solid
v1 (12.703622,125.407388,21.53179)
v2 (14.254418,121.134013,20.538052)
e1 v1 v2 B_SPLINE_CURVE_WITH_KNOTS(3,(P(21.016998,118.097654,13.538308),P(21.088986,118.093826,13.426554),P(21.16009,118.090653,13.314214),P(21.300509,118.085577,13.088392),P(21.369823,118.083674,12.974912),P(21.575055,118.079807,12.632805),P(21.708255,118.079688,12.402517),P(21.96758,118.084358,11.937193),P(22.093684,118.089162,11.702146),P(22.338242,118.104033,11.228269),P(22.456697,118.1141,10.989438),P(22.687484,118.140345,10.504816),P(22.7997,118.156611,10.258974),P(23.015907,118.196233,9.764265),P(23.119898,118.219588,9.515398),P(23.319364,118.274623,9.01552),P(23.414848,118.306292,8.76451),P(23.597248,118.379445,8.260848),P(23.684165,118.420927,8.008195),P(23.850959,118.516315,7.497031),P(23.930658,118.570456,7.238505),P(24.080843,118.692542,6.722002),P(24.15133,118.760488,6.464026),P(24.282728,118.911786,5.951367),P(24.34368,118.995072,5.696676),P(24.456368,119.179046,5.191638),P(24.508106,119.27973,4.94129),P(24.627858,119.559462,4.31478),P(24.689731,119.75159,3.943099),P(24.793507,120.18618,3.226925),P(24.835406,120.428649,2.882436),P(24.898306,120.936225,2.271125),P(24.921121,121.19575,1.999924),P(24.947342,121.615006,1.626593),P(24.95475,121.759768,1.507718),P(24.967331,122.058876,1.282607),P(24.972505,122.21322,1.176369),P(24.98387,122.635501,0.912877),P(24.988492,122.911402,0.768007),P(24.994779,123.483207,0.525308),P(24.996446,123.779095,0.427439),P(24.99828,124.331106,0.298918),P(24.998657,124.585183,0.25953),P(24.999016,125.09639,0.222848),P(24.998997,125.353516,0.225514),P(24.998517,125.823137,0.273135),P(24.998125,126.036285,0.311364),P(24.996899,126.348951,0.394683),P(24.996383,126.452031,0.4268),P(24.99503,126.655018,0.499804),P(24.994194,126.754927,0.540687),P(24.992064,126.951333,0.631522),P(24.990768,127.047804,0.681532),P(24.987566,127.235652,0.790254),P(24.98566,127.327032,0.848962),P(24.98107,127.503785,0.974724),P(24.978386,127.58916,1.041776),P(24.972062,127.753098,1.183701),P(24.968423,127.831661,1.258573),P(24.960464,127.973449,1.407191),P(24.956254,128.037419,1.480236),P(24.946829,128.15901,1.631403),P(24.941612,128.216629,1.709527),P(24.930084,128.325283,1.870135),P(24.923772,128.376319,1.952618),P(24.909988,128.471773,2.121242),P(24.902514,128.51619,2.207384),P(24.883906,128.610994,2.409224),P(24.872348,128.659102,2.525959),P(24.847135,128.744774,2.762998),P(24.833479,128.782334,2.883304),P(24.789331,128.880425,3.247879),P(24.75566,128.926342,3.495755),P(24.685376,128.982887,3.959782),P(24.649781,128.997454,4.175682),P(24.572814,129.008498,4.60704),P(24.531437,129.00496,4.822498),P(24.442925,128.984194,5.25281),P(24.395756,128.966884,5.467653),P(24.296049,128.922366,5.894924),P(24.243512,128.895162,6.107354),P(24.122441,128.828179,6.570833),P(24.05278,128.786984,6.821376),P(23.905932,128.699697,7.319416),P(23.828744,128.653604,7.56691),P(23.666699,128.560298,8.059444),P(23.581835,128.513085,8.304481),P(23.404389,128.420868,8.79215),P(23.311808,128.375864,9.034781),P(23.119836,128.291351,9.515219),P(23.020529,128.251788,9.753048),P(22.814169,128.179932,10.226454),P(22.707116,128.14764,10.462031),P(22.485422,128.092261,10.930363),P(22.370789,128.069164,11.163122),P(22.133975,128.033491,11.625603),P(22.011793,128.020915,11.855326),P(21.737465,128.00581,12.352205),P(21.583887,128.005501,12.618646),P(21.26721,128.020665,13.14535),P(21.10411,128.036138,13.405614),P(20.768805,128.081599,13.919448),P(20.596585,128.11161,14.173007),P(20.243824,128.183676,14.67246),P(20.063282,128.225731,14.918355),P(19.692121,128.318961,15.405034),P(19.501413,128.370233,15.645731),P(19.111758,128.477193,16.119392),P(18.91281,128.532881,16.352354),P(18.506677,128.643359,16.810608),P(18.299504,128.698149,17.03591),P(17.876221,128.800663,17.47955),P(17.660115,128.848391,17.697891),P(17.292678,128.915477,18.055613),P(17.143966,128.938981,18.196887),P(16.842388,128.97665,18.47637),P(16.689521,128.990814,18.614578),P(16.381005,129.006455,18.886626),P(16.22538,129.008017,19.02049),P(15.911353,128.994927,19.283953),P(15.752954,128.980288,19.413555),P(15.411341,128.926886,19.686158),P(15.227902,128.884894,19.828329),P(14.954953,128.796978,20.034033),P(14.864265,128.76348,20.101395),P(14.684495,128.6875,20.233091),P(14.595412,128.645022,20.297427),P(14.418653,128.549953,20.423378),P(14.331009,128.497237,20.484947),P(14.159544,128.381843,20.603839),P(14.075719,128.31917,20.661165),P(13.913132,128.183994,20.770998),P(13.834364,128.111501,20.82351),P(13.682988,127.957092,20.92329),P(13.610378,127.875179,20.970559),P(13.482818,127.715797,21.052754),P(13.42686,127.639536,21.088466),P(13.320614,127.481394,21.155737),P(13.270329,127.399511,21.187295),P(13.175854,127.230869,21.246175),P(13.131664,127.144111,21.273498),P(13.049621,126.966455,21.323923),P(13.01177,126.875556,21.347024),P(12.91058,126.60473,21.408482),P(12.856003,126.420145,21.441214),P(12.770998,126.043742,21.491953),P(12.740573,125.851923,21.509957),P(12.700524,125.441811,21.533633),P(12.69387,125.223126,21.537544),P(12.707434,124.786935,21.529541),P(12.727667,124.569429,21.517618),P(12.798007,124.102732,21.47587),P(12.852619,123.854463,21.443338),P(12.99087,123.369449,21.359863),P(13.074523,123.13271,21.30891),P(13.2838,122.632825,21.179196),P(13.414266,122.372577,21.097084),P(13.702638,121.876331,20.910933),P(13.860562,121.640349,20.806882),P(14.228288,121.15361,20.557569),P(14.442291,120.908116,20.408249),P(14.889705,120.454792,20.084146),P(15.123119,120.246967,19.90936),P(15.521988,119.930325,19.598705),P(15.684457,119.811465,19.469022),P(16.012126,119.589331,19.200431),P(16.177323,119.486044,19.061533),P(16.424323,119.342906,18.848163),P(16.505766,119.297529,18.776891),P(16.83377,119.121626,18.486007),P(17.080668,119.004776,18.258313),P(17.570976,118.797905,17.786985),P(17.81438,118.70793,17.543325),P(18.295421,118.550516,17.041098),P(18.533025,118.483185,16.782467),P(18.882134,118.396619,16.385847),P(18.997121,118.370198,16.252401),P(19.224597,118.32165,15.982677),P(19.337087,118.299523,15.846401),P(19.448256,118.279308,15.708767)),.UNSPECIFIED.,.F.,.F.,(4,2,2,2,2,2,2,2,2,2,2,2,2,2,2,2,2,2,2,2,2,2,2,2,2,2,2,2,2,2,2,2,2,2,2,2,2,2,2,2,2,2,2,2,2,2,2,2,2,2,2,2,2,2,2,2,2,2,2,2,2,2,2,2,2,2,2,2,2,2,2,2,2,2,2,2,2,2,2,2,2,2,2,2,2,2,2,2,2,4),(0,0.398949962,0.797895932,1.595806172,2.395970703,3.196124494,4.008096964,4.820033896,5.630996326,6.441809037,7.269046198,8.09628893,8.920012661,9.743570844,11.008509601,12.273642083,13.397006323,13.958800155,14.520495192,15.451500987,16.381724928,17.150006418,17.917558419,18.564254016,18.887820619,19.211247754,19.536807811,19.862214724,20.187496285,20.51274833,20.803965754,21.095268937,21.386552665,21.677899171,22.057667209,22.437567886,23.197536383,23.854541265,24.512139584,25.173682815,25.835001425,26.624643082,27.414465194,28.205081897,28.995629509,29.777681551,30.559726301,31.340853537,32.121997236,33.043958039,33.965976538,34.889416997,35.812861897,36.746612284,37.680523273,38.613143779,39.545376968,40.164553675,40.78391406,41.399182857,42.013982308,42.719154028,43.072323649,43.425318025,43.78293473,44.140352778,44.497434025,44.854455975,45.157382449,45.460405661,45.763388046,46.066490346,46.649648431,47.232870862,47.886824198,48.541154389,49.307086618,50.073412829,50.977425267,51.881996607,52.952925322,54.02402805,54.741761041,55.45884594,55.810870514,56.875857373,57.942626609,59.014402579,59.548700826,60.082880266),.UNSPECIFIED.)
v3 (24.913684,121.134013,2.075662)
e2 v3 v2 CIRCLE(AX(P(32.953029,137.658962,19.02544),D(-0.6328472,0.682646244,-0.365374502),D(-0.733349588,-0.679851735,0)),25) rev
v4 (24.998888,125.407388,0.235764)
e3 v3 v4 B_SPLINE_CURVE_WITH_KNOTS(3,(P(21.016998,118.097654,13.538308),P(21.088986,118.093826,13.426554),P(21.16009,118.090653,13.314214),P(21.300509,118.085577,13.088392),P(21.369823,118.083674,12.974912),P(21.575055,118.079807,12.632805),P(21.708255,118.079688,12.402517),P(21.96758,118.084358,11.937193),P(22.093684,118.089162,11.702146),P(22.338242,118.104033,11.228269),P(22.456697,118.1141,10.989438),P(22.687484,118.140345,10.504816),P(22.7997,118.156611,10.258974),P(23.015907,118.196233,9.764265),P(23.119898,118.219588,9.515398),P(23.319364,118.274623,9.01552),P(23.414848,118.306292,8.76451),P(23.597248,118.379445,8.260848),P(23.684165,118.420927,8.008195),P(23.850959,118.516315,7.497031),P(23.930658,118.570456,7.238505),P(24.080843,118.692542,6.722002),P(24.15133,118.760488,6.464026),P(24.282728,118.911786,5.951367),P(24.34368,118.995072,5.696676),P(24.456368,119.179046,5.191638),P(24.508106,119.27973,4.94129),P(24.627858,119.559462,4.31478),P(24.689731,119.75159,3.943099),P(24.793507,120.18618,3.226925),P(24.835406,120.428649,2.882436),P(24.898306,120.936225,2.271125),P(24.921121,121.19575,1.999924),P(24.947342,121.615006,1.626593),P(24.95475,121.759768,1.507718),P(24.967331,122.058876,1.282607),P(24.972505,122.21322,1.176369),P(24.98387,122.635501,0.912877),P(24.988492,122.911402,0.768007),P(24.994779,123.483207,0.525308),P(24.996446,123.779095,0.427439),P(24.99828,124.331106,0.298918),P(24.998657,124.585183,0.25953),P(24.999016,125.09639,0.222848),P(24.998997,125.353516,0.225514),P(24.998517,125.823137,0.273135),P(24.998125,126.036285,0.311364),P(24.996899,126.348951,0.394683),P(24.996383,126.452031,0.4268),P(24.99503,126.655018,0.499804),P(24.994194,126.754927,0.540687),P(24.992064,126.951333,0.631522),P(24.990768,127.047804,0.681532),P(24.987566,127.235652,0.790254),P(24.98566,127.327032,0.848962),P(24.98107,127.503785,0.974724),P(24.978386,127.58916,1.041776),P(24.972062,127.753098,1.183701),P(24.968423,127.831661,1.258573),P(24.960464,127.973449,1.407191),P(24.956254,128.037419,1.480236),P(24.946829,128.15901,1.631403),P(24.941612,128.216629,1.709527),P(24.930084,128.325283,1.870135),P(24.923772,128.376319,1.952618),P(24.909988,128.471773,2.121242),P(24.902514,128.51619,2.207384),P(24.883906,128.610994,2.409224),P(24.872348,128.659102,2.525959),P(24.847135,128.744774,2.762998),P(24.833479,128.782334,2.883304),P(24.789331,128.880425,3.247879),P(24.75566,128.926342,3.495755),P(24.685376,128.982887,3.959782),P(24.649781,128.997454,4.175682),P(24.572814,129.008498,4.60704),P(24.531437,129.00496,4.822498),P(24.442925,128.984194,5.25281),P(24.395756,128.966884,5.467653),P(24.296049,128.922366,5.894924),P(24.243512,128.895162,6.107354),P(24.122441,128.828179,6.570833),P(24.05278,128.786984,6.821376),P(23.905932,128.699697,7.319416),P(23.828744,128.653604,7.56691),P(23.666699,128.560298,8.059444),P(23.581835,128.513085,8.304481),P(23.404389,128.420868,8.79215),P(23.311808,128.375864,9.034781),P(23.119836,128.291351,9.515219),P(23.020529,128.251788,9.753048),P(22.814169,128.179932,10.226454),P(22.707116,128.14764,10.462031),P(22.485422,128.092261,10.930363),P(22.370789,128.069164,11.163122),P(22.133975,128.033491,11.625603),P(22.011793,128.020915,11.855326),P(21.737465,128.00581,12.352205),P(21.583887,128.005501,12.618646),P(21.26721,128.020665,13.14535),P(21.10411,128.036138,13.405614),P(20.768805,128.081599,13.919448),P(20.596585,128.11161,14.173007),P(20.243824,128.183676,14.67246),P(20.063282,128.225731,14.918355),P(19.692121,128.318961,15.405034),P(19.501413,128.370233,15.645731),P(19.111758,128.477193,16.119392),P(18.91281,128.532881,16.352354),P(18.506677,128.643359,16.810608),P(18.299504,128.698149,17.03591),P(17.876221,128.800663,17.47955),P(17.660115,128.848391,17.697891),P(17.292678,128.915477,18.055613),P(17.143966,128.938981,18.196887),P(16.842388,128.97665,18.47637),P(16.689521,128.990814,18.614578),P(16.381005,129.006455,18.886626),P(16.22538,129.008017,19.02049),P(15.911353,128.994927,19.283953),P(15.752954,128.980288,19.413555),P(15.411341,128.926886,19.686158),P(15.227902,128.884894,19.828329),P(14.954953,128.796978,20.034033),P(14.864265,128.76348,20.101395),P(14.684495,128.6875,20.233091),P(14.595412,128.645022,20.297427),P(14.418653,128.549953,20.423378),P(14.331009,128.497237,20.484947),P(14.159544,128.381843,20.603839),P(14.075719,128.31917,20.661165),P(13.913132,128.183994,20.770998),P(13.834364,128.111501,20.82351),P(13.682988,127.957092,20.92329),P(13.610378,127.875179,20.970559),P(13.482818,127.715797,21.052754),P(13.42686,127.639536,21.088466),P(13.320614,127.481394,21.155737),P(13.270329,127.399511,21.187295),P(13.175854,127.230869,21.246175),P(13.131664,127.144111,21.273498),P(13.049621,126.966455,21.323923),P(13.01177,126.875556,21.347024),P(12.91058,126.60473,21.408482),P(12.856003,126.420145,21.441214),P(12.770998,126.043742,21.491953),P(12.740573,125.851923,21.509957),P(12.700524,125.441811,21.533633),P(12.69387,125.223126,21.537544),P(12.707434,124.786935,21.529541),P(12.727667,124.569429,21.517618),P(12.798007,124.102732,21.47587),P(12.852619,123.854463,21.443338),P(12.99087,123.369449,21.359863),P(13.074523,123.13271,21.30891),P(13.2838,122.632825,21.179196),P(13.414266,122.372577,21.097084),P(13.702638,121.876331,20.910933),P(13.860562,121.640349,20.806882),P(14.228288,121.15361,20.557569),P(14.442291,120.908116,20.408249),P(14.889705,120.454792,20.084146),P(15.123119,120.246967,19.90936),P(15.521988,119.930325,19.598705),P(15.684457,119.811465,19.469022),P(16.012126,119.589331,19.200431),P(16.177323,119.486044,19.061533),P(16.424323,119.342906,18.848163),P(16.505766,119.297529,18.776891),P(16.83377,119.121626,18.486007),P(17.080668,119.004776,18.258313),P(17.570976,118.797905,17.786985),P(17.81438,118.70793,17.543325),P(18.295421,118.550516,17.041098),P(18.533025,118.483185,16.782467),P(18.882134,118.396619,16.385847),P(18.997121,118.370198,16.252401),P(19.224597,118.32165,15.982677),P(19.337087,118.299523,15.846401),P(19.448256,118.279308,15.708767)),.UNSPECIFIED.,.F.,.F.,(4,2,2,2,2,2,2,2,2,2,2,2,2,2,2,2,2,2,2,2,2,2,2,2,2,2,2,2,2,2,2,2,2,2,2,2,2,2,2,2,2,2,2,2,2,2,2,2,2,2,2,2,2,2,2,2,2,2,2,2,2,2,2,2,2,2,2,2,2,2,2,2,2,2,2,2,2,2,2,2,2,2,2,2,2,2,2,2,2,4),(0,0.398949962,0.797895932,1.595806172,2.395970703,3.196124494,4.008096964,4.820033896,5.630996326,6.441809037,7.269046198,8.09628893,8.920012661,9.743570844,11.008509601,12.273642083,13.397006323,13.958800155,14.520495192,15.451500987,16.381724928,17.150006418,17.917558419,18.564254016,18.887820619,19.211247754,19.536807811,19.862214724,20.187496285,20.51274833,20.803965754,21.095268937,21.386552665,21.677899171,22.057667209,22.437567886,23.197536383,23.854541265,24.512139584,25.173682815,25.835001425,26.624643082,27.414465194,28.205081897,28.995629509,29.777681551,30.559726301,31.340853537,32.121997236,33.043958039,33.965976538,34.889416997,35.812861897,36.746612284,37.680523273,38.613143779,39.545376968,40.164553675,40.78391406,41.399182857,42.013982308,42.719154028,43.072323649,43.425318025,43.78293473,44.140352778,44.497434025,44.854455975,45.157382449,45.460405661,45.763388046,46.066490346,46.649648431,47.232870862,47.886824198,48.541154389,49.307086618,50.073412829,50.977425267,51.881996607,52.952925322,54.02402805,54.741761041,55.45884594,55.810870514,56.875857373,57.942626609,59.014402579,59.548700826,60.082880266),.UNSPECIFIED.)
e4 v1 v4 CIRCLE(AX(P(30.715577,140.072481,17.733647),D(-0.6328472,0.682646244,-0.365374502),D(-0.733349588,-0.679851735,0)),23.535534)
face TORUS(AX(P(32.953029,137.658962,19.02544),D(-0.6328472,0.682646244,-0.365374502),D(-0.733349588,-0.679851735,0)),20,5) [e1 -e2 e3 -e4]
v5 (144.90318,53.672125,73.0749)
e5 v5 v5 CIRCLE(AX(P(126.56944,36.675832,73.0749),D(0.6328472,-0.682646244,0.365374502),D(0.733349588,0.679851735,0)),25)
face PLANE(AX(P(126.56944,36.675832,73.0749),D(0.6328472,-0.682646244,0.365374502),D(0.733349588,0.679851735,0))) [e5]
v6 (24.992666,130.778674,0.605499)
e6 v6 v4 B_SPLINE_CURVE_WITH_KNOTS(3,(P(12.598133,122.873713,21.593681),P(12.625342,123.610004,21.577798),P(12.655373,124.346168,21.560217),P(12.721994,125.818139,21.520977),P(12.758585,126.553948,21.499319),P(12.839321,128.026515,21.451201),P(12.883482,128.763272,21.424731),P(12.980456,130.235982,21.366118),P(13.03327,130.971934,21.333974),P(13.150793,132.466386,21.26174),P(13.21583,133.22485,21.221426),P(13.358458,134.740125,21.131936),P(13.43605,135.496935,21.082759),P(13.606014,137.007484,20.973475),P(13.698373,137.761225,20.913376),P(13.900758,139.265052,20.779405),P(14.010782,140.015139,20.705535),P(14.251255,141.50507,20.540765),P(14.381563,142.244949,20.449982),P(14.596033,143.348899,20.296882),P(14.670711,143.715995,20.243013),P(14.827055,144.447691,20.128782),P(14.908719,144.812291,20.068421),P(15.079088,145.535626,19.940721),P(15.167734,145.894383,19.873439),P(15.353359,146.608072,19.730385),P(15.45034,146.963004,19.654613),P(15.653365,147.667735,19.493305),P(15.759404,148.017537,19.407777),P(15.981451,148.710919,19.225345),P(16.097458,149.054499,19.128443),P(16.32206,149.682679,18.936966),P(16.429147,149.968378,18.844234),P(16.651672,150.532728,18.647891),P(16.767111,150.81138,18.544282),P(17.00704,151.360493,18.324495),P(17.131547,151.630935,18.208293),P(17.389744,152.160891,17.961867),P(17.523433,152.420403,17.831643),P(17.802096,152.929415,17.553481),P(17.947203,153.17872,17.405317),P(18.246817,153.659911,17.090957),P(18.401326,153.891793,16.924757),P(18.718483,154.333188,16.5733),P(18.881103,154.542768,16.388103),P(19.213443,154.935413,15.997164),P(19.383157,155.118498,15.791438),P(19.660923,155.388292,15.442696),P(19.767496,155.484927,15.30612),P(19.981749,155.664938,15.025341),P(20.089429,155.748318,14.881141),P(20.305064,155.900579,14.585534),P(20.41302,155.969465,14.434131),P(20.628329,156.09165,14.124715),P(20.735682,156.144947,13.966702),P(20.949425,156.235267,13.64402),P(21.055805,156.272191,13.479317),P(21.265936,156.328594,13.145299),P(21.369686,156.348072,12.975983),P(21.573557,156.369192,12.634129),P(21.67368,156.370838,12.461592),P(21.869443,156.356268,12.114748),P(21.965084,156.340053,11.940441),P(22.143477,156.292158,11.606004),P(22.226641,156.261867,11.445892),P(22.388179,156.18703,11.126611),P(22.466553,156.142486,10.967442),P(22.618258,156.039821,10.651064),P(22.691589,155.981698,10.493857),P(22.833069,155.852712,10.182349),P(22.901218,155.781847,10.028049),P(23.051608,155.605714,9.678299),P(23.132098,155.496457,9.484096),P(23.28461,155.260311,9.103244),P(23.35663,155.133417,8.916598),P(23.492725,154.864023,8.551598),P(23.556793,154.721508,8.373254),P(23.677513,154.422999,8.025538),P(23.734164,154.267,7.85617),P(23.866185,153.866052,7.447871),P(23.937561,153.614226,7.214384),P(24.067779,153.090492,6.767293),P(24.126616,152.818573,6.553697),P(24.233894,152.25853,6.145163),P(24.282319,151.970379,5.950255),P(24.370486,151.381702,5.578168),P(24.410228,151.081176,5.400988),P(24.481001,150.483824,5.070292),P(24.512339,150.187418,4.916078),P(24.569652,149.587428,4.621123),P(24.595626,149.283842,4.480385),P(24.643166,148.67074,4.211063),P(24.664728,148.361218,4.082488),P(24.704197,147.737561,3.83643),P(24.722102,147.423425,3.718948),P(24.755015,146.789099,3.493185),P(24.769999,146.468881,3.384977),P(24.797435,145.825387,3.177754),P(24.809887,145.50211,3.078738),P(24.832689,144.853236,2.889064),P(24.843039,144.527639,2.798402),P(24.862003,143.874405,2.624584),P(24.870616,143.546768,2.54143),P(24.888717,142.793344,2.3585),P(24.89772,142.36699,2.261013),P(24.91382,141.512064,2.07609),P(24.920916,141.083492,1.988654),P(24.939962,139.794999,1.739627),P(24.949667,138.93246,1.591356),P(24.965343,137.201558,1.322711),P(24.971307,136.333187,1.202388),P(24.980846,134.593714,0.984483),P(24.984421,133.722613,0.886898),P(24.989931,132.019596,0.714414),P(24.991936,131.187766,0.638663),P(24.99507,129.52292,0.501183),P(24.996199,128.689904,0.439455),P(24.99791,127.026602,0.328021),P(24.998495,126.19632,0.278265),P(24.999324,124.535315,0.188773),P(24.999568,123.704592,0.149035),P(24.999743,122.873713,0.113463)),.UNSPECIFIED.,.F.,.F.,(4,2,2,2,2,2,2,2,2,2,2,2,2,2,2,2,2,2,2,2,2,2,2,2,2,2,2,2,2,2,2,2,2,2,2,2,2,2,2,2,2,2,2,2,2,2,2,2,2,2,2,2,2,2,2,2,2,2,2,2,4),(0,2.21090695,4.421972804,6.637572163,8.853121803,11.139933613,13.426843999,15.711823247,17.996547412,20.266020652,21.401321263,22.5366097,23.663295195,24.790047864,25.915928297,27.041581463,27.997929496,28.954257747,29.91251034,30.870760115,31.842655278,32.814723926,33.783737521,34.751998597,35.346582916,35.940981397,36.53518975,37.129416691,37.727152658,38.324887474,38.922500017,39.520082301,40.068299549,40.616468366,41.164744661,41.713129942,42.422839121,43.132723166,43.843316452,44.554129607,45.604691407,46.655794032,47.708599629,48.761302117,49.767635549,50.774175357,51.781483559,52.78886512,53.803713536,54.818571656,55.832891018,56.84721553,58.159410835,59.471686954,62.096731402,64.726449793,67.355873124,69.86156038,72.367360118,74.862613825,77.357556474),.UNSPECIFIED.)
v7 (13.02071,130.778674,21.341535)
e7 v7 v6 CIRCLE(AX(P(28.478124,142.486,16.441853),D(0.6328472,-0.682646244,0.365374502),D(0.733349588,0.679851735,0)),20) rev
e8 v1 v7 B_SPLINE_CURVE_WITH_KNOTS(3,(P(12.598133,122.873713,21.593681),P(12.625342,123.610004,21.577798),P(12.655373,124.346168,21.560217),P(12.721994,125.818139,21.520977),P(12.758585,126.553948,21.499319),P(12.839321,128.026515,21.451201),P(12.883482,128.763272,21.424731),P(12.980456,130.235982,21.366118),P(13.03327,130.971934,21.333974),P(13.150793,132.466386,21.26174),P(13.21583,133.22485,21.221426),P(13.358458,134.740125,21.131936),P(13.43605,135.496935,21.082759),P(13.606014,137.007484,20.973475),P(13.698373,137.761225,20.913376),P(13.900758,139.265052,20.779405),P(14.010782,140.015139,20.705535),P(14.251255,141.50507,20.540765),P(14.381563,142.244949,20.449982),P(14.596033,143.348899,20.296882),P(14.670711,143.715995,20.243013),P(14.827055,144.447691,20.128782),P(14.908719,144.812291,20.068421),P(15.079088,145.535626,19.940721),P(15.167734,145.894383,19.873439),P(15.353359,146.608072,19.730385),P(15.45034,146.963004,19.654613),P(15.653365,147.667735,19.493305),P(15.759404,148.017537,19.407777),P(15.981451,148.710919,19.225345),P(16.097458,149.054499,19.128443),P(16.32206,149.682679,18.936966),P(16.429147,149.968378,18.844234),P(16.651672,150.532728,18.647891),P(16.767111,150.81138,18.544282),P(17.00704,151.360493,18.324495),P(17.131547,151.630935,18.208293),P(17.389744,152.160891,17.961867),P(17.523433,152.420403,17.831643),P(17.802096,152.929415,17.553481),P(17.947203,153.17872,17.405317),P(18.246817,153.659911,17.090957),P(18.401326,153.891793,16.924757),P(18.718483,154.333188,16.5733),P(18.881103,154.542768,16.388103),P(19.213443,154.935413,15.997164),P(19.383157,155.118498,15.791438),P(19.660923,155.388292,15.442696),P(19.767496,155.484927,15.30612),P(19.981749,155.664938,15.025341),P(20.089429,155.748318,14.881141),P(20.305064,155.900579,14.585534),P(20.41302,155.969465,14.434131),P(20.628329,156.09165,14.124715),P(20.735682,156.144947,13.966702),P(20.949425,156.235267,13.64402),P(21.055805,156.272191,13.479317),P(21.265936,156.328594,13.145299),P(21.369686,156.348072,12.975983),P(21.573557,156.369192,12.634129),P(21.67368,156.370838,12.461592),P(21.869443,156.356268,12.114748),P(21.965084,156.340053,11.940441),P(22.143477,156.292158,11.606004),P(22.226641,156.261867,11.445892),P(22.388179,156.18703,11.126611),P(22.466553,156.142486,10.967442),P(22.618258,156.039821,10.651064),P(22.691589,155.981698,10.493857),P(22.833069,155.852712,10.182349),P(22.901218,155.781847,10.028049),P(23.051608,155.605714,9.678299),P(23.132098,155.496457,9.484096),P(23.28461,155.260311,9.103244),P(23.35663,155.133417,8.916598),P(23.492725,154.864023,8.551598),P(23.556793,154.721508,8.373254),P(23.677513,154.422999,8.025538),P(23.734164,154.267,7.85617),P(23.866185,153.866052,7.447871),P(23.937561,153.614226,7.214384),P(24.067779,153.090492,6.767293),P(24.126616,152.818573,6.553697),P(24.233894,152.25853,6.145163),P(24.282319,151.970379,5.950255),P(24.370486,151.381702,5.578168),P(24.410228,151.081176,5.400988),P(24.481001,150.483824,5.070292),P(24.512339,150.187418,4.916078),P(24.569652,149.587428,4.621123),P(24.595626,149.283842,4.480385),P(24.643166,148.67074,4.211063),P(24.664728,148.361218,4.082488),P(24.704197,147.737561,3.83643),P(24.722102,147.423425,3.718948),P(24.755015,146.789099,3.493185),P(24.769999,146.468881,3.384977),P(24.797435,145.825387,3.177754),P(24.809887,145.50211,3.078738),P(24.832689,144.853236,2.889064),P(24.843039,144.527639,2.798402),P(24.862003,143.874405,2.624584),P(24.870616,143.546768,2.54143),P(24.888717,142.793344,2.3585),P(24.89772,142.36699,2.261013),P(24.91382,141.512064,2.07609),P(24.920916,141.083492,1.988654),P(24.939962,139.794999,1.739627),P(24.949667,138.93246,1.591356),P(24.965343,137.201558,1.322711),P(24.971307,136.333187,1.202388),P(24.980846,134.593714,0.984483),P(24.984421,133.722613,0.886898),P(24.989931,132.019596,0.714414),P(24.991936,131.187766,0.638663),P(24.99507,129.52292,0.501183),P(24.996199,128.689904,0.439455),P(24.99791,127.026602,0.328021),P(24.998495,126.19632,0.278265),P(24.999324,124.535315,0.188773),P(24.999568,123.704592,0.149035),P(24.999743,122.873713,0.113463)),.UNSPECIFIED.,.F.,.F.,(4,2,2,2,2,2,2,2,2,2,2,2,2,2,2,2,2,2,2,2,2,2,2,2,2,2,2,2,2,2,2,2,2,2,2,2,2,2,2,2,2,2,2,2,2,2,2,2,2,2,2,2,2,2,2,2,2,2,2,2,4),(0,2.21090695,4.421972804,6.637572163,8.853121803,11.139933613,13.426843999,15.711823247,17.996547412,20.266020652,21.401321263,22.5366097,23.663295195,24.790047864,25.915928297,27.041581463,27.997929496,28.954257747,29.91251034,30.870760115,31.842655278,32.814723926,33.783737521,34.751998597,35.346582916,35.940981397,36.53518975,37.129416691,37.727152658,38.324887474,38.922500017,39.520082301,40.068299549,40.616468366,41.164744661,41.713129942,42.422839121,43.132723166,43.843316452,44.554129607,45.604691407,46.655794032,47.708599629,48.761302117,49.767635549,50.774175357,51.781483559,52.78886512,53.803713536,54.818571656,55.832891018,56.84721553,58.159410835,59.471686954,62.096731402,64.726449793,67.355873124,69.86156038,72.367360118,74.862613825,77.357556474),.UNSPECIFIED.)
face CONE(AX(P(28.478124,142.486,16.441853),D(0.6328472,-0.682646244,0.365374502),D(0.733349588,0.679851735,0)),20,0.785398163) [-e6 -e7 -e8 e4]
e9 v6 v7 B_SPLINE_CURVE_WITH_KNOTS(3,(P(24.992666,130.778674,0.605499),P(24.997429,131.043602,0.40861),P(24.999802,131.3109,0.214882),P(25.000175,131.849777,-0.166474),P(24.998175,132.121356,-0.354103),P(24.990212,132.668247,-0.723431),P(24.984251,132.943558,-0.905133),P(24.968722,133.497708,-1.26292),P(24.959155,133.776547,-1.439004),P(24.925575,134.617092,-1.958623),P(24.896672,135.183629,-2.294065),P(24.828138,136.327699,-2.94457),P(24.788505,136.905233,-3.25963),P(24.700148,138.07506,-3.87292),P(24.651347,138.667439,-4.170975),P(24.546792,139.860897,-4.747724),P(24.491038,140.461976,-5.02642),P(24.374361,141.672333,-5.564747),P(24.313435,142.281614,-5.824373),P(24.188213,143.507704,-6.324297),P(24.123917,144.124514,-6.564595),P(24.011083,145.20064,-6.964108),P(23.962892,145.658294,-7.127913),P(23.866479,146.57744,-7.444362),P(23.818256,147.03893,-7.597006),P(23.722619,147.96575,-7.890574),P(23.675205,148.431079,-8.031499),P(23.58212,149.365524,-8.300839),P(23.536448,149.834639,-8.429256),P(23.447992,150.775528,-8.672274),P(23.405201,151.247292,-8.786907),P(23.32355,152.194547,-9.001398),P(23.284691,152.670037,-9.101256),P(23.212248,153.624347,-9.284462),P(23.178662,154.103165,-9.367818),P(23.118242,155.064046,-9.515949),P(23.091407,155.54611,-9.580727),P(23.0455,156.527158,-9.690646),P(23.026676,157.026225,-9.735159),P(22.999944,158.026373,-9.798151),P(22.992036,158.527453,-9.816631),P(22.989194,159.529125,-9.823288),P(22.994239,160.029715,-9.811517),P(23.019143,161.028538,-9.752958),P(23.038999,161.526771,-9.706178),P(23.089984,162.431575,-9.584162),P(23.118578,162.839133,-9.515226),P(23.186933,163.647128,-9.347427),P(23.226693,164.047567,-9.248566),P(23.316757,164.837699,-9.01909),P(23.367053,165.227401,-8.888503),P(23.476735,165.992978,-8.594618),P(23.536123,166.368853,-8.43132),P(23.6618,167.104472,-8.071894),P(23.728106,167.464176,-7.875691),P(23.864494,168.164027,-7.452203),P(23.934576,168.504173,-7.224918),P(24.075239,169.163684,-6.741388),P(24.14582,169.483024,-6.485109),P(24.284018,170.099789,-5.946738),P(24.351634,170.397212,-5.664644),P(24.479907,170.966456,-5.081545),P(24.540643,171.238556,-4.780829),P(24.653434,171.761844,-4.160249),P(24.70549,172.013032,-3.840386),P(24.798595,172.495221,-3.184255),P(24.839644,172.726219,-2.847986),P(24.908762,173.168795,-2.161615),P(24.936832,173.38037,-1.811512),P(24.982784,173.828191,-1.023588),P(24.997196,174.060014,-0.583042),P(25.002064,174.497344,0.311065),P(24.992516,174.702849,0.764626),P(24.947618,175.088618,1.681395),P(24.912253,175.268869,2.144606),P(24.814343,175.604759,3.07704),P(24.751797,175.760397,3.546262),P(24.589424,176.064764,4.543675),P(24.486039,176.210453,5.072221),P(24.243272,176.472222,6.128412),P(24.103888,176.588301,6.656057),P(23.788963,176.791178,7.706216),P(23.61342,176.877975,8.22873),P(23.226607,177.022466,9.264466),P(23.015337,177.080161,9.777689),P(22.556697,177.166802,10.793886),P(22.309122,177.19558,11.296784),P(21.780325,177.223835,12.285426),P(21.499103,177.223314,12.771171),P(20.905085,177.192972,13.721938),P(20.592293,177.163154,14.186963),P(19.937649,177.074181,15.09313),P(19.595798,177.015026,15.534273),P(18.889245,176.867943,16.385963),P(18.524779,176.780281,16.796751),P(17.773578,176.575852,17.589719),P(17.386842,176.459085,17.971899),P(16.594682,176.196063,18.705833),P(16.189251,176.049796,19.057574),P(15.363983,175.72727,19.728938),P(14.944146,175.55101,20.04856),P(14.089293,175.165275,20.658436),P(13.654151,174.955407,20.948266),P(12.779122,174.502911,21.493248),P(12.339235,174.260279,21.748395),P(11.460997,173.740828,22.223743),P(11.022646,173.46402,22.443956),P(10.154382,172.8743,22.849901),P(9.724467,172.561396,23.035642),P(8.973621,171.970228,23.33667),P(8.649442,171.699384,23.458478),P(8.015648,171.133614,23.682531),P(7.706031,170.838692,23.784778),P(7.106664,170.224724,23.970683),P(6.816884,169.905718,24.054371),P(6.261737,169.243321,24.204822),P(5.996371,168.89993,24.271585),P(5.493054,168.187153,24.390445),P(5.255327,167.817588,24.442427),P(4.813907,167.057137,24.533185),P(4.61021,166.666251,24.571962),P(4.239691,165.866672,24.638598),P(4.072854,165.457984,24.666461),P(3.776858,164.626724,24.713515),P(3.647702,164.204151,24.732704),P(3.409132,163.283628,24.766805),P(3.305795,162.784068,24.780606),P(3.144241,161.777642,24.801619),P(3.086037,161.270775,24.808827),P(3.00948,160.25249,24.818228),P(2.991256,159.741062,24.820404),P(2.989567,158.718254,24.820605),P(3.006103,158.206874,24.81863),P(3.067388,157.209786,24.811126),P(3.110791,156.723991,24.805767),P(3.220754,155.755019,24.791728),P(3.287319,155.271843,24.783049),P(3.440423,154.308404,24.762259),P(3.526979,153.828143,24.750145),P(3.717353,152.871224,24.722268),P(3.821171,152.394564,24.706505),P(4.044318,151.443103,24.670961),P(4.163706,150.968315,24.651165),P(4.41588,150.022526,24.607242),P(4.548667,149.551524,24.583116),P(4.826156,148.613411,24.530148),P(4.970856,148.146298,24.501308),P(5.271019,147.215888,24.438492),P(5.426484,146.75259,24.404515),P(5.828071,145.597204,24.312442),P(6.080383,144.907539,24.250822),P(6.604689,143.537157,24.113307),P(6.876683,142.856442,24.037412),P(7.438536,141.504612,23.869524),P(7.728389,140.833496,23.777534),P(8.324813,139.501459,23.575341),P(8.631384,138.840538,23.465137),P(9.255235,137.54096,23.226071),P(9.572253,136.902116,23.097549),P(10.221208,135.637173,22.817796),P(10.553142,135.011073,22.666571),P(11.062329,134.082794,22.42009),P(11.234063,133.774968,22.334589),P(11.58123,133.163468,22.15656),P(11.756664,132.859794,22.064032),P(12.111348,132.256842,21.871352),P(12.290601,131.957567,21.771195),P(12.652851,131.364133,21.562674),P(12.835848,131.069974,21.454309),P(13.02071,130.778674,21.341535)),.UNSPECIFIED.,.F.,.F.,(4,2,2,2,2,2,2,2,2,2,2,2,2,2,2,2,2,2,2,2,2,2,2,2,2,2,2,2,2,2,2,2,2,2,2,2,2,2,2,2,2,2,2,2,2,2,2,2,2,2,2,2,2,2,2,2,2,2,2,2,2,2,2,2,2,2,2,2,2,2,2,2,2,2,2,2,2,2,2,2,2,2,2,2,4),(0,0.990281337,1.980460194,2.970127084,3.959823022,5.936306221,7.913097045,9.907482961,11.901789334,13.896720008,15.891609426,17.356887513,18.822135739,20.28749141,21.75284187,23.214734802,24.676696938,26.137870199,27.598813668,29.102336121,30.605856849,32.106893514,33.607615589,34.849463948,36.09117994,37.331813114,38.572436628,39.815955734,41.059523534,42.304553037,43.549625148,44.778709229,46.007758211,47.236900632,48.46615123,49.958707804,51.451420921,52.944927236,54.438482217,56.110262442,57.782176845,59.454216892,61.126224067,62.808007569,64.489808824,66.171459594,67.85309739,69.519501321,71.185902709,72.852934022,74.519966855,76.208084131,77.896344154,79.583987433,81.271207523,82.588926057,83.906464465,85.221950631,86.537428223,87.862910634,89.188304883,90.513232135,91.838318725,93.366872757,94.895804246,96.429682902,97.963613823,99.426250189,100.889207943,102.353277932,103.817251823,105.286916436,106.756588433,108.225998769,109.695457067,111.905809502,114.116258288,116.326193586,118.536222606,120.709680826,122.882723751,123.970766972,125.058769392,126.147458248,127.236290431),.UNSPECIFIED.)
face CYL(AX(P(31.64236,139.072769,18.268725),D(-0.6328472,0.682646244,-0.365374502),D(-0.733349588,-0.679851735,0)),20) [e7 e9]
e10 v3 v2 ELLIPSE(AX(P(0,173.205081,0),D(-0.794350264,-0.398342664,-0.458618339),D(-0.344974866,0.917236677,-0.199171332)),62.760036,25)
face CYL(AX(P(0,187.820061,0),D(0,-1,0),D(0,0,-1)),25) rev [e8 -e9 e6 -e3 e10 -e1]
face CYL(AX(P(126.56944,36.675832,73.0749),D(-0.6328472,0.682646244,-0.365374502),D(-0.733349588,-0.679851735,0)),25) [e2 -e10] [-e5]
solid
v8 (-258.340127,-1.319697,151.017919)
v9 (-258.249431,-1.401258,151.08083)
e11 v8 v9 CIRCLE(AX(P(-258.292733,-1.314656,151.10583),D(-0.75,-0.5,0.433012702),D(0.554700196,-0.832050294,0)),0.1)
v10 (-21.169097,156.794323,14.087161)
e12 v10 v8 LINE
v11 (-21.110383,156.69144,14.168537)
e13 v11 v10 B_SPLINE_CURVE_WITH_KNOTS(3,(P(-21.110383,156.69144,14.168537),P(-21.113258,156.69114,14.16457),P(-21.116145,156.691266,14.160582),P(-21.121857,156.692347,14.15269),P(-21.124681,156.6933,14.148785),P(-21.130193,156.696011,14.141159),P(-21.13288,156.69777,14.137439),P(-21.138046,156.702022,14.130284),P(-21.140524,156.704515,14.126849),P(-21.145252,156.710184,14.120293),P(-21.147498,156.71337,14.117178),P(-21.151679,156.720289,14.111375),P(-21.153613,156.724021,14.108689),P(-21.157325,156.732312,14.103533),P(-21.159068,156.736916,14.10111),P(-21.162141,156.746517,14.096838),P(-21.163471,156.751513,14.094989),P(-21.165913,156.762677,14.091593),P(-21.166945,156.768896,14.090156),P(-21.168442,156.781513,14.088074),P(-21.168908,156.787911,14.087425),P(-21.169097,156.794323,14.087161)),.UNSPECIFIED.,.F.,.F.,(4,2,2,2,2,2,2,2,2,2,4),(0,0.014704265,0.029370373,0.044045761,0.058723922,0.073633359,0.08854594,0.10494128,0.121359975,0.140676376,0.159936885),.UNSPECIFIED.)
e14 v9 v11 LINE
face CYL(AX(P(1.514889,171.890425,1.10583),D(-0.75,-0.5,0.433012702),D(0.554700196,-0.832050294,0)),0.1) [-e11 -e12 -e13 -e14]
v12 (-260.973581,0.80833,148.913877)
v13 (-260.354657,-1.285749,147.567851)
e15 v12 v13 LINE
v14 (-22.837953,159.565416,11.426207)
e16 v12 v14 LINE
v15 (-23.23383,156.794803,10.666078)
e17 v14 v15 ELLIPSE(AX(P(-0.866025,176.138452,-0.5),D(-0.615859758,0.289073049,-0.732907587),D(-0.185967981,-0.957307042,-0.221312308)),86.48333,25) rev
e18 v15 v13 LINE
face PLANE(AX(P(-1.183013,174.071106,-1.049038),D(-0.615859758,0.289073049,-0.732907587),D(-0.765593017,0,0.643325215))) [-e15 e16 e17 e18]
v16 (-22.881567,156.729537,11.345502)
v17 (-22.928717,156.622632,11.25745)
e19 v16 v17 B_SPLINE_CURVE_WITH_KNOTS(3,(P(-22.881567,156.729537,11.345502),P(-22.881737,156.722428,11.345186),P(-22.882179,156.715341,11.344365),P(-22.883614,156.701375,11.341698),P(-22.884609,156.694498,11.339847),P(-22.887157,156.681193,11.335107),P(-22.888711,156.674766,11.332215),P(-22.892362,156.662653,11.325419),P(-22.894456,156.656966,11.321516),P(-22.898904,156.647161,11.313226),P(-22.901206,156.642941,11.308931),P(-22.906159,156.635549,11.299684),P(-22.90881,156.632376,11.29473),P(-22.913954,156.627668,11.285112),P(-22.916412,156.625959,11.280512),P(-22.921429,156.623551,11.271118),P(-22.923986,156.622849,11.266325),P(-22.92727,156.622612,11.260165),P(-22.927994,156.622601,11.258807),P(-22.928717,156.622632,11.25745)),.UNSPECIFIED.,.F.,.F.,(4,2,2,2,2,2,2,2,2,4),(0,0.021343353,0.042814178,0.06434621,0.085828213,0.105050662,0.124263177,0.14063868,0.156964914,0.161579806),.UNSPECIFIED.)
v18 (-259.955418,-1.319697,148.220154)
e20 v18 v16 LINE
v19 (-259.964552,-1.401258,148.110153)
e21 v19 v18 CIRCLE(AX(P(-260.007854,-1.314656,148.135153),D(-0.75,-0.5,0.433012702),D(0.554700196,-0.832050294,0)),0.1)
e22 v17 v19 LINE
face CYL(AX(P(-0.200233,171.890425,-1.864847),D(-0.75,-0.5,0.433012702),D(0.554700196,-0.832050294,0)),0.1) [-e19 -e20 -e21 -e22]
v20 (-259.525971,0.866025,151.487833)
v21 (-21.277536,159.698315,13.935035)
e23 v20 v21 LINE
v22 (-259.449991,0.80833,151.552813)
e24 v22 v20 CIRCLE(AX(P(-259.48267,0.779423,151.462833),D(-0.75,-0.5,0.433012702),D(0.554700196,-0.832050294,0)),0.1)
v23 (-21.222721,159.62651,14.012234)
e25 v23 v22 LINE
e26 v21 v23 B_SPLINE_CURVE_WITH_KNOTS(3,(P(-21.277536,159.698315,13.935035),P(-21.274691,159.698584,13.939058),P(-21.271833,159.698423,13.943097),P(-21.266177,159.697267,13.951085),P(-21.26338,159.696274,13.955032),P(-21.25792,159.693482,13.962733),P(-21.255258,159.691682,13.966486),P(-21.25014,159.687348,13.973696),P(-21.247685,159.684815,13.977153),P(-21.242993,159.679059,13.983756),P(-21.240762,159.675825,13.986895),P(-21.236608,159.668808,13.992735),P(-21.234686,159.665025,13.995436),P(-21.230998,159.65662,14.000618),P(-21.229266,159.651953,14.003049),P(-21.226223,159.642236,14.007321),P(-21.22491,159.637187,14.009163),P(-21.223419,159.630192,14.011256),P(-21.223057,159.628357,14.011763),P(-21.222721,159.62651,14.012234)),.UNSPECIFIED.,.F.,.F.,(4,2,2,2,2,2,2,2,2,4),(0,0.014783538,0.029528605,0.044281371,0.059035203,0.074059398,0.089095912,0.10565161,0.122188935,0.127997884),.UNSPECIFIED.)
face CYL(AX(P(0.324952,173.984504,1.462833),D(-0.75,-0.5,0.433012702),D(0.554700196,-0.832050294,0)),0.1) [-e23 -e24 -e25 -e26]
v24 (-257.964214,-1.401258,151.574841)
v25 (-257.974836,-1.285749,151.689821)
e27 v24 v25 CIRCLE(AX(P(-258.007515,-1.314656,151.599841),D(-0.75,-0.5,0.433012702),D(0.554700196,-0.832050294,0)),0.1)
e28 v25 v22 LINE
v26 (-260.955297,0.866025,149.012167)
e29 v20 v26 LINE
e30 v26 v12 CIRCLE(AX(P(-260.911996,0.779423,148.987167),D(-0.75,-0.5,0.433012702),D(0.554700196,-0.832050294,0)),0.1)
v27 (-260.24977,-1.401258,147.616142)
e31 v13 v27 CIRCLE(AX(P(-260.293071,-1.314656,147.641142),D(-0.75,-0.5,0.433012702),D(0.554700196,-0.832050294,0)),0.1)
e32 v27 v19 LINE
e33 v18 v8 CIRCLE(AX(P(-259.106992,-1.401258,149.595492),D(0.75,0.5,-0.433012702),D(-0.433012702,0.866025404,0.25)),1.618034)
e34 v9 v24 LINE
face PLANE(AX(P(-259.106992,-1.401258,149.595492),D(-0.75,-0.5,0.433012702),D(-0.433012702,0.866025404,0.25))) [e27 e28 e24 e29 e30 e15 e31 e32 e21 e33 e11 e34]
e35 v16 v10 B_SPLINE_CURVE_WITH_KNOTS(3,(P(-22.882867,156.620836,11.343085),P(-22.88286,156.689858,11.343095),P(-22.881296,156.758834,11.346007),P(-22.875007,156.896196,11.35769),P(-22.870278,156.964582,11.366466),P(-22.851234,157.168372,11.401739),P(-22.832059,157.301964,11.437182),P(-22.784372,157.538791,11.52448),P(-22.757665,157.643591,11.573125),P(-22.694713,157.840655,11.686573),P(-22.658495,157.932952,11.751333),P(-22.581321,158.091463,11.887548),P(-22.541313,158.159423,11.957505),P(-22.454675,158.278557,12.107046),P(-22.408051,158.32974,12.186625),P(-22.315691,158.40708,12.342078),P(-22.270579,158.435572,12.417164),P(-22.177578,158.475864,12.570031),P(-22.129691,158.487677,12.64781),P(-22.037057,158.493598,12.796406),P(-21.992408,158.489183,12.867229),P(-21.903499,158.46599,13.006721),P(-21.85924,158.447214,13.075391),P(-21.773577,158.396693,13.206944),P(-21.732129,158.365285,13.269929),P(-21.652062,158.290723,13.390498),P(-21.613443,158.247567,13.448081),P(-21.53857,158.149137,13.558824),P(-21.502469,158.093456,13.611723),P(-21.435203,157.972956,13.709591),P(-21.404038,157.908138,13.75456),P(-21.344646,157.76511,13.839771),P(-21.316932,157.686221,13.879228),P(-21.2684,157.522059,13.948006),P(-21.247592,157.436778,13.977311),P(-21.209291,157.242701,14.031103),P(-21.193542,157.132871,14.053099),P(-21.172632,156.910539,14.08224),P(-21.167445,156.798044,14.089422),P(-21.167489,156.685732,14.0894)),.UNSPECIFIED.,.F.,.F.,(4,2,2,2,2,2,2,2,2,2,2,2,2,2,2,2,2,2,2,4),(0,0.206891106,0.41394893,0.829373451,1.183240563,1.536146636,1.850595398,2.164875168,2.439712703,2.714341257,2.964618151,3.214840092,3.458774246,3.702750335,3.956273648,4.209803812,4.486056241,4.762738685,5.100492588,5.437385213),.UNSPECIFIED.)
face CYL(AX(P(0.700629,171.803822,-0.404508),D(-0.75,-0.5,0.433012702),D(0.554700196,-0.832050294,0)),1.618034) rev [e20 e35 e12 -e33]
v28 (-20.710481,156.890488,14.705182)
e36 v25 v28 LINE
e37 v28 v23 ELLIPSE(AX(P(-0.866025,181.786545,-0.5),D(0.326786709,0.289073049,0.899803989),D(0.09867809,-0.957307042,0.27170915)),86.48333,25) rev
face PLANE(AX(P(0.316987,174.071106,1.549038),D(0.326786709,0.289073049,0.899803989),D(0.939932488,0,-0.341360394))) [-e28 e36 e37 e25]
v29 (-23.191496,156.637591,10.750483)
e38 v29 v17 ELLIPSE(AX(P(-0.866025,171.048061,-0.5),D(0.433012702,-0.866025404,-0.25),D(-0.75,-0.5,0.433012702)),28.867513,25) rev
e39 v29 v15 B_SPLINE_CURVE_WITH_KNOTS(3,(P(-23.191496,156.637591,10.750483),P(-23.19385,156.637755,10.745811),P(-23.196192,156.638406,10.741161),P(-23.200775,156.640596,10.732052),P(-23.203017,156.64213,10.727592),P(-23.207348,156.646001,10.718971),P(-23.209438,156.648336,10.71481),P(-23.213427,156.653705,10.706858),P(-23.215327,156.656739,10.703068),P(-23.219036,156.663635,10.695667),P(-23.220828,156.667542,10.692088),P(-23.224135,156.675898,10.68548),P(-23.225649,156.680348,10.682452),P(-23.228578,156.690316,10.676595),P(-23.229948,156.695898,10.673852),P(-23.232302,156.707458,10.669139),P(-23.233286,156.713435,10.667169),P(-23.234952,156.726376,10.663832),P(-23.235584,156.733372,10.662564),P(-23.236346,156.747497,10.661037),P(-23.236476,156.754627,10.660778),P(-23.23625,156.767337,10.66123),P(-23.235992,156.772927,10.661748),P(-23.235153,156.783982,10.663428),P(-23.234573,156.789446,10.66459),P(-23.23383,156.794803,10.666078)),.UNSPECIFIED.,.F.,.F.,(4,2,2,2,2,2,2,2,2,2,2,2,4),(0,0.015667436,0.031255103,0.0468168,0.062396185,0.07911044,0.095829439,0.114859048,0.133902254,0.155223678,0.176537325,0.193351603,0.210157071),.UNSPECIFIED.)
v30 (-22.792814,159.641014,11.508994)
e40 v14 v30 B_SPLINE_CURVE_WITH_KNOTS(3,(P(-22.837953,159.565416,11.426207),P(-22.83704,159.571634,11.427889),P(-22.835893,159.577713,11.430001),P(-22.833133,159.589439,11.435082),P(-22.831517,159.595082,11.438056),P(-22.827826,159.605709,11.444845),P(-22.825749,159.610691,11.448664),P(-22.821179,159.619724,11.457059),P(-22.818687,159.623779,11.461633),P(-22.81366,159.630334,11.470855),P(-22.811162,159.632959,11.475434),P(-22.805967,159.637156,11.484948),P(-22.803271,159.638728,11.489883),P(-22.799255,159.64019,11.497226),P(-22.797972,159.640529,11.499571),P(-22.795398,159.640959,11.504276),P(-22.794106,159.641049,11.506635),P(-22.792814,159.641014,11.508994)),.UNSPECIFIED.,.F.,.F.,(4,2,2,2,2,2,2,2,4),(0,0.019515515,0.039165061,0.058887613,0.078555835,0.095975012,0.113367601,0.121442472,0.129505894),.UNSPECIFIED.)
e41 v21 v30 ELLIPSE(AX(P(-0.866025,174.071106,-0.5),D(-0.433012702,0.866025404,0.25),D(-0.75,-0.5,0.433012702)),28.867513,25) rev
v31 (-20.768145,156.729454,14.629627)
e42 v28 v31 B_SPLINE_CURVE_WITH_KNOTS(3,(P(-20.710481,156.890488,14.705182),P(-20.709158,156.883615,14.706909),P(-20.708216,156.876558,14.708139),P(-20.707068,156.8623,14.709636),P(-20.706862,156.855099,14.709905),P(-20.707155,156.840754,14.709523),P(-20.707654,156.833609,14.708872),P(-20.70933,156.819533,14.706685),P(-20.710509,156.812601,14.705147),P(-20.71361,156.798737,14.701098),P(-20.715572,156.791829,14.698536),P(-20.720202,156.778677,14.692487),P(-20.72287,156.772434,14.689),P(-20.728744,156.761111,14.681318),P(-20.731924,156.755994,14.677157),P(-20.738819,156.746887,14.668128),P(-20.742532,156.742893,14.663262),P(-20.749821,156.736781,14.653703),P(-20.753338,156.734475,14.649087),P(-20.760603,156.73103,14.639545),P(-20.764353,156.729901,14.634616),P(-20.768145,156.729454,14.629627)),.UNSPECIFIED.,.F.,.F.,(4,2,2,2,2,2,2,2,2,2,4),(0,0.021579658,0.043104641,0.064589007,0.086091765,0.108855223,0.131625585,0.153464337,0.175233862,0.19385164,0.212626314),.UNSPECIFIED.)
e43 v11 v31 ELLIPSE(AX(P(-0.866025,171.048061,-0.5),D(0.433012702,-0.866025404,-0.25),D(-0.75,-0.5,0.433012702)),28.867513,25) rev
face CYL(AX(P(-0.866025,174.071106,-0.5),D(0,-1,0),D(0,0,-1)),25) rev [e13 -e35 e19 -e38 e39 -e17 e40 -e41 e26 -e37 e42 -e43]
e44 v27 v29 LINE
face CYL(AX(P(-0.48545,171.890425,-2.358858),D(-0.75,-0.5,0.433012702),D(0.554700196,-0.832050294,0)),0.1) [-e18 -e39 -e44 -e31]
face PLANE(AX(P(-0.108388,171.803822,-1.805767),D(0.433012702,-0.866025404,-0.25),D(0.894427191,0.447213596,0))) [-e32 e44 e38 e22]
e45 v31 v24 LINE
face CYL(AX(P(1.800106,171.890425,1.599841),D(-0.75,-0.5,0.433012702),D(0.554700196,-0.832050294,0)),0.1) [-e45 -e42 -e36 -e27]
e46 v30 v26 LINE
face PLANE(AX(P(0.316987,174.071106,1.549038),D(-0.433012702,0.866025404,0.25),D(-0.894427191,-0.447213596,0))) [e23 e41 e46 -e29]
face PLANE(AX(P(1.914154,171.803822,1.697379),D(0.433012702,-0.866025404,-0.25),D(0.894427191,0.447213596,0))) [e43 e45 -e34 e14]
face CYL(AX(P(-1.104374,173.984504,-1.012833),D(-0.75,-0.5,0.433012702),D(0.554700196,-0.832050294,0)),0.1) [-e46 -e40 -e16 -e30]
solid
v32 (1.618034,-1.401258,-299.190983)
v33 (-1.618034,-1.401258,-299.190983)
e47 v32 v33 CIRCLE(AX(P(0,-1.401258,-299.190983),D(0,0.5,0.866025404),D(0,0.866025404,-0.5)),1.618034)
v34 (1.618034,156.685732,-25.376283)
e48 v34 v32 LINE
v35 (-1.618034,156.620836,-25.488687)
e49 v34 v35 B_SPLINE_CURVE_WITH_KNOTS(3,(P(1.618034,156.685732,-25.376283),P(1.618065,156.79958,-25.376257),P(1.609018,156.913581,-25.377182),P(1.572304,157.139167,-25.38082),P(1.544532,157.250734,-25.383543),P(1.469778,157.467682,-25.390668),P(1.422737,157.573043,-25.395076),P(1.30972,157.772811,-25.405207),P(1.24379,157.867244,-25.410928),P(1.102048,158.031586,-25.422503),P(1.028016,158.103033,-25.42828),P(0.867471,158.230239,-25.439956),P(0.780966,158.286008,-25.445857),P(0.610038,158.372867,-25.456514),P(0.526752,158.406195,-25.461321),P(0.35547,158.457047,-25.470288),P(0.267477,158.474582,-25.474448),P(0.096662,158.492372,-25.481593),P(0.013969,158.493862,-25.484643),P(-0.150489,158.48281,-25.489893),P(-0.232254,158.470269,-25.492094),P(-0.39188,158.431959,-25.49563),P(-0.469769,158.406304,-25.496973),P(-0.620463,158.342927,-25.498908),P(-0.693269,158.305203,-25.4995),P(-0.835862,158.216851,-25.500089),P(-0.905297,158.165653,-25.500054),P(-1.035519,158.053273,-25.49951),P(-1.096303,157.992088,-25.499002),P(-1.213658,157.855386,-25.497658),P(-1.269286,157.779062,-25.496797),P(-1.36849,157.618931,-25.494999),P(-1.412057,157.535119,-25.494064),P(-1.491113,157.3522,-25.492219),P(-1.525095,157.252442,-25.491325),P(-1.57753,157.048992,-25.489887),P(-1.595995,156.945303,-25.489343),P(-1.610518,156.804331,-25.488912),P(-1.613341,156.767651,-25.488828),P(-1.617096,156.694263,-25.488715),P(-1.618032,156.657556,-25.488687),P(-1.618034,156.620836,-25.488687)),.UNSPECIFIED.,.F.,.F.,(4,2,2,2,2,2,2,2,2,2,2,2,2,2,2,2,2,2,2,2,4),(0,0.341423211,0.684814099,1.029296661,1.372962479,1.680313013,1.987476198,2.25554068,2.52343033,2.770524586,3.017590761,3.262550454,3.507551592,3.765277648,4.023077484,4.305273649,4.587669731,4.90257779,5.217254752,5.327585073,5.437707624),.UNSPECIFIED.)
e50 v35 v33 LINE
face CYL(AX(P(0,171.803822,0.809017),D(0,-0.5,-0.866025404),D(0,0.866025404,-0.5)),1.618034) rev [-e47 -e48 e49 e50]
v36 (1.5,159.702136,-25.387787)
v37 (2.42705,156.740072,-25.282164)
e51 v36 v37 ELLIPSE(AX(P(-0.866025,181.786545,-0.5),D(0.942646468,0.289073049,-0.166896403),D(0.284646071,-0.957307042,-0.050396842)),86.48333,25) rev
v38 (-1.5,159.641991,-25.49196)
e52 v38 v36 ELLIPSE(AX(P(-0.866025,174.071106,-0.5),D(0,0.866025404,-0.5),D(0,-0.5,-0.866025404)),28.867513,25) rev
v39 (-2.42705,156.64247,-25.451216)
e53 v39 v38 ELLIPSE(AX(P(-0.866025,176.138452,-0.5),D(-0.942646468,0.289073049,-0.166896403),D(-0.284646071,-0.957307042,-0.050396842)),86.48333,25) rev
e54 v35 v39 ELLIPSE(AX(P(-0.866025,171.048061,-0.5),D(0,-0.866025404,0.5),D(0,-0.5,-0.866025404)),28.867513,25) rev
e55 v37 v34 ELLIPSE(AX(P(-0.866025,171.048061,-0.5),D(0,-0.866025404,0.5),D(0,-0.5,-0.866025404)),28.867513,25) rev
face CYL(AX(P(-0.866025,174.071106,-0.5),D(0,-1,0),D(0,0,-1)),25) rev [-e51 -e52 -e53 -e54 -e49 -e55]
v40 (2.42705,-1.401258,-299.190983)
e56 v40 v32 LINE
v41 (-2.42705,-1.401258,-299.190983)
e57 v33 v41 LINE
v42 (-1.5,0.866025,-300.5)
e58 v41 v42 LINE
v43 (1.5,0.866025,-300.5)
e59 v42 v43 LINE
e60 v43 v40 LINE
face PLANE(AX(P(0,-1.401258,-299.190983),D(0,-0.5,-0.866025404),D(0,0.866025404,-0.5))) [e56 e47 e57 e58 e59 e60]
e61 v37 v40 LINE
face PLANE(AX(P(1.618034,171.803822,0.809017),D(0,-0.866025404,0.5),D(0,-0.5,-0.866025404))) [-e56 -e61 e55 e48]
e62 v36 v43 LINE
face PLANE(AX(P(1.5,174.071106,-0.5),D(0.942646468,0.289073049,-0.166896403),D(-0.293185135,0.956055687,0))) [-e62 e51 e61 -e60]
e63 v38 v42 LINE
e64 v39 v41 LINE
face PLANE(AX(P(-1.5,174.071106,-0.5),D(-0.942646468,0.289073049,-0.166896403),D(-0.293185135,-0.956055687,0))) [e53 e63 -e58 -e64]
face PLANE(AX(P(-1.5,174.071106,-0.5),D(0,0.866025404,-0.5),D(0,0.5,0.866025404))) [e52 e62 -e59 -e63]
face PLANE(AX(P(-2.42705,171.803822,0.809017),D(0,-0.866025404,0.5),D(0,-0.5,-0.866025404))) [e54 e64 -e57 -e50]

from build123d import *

# Parameters (mm, degrees)
CIRPATTERN2_START   = -259.807621119
CIRPATTERN2_DEPTH   = 346.410161535
SKETCH7_R           = 25
CUT_EXTRUDE1_DEPTH  = 435.415827251
SKETCH9_R           = 20
BOSS_EXTRUDE2_DEPTH = 50
SKETCH10_R          = 25
BOSS_EXTRUDE3_DEPTH = 150
CHAMFER2_SIZE       = 5
SKETCH12_R          = 25
CUT_EXTRUDE2_DEPTH  = 441.105369443
FILLET2_R           = 0.1


with BuildPart() as part:
    # Sweep3: sweep along a path in Sketch5
    with BuildLine(Plane(origin=(0, 0, 0), x_dir=(0, 0, -1), z_dir=(1, 0, 0))) as sweep3_path:
        Line((0, 173.2050808), (300, 0))
    # Sketch6 → Sweep3 (sweep)
    with BuildSketch(Plane(origin=(0, 173.2050808, 0), x_dir=(-1, 0, 0), z_dir=(0, -0.500000000093341, -0.8660254037305483))):
        with BuildLine():
            Line((-1.6180339, -1.6180339), (-2.4270505, -1.6180339))
            Line((-2.4270505, -1.6180339), (-1.5, 1))
            Line((-1.5, 1), (1.5, 1))
            Line((1.5, 1), (2.4270505, -1.6180339))
            Line((2.4270505, -1.6180339), (1.6180339, -1.6180339))
            ThreePointArc((1.6180339, -1.6180339), (0, 0), (-1.6180339, -1.6180339))
        make_face()
    sweep(path=sweep3_path.line)

    # CirPattern2: read off the stored shape, not the designer's step
    # CirPattern2 outline → CirPattern2 (add)
    with BuildSketch(Plane(origin=(0, 0, 0), x_dir=(0.6614378278190619, -0.5669467095390479, 0.49099025293059273), z_dir=(0.7499999999533339, 0.5000000000933409, -0.4330127018652669)).offset(CIRPATTERN2_START)):
        with BuildLine():
            Line((-97.718810887, -115.127251367), (-95.304121077, -113.755100773))
            Line((-95.304121077, -113.755100773), (-95.915680142, -113.225475086))
            ThreePointArc((-95.915680142, -113.225475086), (-98.198050635, -113.389341915), (-98.361917463, -111.106971422))
            Line((-98.361917463, -111.106971422), (-98.973476529, -110.577345735))
            Line((-98.973476529, -110.577345735), (-99.986597725, -113.163290355))
            Line((-99.986597725, -113.163290355), (-97.718810887, -115.127251367))
        make_face()
    extrude(amount=CIRPATTERN2_DEPTH)

    # Sketch7 → Cut-Extrude1 (cut, through all)
    with BuildSketch(Plane(origin=(0, 0, 0), x_dir=(1, 0, 0), z_dir=(0, 1, 0))):
        with Locations((-0.866025404, 0.5)):
            Circle(SKETCH7_R)
    extrude(amount=CUT_EXTRUDE1_DEPTH, mode=Mode.SUBTRACT)


with BuildPart() as cut_extrude1_piece_1:
    # of the separate pieces the step leaves, piece 1, a body of its own (cut_extrude1_pieces)
    add(part.part.solids().sort_by_distance((-258.297974954, -1.401258462, 150.996749986))[0])

    # Fillet2
    fillet2_edges = [cut_extrude1_piece_1.edges().sort_by_distance(p)[0] for p in [
        (-139.732731811, 77.642236986, 82.543074941),
        (-141.399438173, 77.609788679, 79.768659077),
        (-139.287468833, 77.669406772, 83.220174144),
        (-140.363551006, 80.284080644, 82.770984765),
        (-141.908659495, 80.254008319, 80.198951952),
        (-141.787721189, 77.620605535, 79.058662477),
    ]]
    fillet(fillet2_edges, radius=FILLET2_R)


with BuildPart() as cut_extrude1_piece_2:
    # of the separate pieces the step leaves, piece 2, a body of its own (cut_extrude1_pieces)
    add(part.part.solids().sort_by_distance((2.4270505, 156.740072006, -25.282163971))[0])


with BuildPart() as body_3:
    # Sketch9 → Boss-Extrude2 (new body)
    with BuildSketch(Plane(origin=(0, 173.2050808, 0), x_dir=(0.7742767082385598, 0.5579539715562799, -0.2986351364187311), z_dir=(-0.6328472004198645, 0.6826462440832614, -0.36537450151831374))):
        with Locations(Location((0, 0, 0), (0, 0, 161.287709375))):
            Circle(SKETCH9_R)
    extrude(amount=-BOSS_EXTRUDE2_DEPTH)

    # Sketch10 → Boss-Extrude3 (add)
    with BuildSketch(Plane(origin=(-43.184099341, 46.582276417, -24.932351379), x_dir=(0.7742767082385598, 0.5579539715562799, -0.29863513641873113), z_dir=(0.6328472004198645, -0.6826462440832614, 0.36537450151831374))):
        with Locations(Location((96.640462726, 81.733983968, 0), (0, 0, 18.712290625))):
            Circle(SKETCH10_R)
    extrude(amount=BOSS_EXTRUDE3_DEPTH)

    # Chamfer2
    chamfer2_edges = [body_3.edges().sort_by_distance(p)[0] for p in [
        (46.309351779, 152.669803301, 18.268725076),
    ]]
    chamfer(chamfer2_edges, length=CHAMFER2_SIZE - 0.0001)  # a hair under: the kernel refuses the full size

    # Fillet1: read off the stored shape, not the designer's step
    # Fillet1 outline → Fillet1 (revolve, cut)
    with BuildSketch(Plane(origin=(74.826459362, 92.490492179, 43.201076455), x_dir=(0.7742767082385594, 0.55795397155628, -0.2986351364187316), z_dir=(0, -0.4718913763395034, -0.8816566956227401))):
        with BuildLine():
            Line((25, -69.702263958), (25, -66.166730052))
            ThreePointArc((25, -66.166730052), (24.619397663, -68.080147214), (23.535533906, -69.702263958))
            Line((23.535533906, -69.702263958), (25, -69.702263958))
        make_face()
    revolve(axis=Axis((74.826459362, 92.490492179, 43.201076455), (0.6328472004198648, -0.6826462440832607, 0.3653745015183139)), mode=Mode.SUBTRACT)

    # Sketch12 → Cut-Extrude2 (cut, through all)
    with BuildSketch(Plane(origin=(0, 0, 0), x_dir=(1, 0, 0), z_dir=(0, 1, 0))):
        Circle(SKETCH12_R)
    extrude(amount=CUT_EXTRUDE2_DEPTH, mode=Mode.SUBTRACT)


solid = Compound([cut_extrude1_piece_1.part, cut_extrude1_piece_2.part, body_3.part])
